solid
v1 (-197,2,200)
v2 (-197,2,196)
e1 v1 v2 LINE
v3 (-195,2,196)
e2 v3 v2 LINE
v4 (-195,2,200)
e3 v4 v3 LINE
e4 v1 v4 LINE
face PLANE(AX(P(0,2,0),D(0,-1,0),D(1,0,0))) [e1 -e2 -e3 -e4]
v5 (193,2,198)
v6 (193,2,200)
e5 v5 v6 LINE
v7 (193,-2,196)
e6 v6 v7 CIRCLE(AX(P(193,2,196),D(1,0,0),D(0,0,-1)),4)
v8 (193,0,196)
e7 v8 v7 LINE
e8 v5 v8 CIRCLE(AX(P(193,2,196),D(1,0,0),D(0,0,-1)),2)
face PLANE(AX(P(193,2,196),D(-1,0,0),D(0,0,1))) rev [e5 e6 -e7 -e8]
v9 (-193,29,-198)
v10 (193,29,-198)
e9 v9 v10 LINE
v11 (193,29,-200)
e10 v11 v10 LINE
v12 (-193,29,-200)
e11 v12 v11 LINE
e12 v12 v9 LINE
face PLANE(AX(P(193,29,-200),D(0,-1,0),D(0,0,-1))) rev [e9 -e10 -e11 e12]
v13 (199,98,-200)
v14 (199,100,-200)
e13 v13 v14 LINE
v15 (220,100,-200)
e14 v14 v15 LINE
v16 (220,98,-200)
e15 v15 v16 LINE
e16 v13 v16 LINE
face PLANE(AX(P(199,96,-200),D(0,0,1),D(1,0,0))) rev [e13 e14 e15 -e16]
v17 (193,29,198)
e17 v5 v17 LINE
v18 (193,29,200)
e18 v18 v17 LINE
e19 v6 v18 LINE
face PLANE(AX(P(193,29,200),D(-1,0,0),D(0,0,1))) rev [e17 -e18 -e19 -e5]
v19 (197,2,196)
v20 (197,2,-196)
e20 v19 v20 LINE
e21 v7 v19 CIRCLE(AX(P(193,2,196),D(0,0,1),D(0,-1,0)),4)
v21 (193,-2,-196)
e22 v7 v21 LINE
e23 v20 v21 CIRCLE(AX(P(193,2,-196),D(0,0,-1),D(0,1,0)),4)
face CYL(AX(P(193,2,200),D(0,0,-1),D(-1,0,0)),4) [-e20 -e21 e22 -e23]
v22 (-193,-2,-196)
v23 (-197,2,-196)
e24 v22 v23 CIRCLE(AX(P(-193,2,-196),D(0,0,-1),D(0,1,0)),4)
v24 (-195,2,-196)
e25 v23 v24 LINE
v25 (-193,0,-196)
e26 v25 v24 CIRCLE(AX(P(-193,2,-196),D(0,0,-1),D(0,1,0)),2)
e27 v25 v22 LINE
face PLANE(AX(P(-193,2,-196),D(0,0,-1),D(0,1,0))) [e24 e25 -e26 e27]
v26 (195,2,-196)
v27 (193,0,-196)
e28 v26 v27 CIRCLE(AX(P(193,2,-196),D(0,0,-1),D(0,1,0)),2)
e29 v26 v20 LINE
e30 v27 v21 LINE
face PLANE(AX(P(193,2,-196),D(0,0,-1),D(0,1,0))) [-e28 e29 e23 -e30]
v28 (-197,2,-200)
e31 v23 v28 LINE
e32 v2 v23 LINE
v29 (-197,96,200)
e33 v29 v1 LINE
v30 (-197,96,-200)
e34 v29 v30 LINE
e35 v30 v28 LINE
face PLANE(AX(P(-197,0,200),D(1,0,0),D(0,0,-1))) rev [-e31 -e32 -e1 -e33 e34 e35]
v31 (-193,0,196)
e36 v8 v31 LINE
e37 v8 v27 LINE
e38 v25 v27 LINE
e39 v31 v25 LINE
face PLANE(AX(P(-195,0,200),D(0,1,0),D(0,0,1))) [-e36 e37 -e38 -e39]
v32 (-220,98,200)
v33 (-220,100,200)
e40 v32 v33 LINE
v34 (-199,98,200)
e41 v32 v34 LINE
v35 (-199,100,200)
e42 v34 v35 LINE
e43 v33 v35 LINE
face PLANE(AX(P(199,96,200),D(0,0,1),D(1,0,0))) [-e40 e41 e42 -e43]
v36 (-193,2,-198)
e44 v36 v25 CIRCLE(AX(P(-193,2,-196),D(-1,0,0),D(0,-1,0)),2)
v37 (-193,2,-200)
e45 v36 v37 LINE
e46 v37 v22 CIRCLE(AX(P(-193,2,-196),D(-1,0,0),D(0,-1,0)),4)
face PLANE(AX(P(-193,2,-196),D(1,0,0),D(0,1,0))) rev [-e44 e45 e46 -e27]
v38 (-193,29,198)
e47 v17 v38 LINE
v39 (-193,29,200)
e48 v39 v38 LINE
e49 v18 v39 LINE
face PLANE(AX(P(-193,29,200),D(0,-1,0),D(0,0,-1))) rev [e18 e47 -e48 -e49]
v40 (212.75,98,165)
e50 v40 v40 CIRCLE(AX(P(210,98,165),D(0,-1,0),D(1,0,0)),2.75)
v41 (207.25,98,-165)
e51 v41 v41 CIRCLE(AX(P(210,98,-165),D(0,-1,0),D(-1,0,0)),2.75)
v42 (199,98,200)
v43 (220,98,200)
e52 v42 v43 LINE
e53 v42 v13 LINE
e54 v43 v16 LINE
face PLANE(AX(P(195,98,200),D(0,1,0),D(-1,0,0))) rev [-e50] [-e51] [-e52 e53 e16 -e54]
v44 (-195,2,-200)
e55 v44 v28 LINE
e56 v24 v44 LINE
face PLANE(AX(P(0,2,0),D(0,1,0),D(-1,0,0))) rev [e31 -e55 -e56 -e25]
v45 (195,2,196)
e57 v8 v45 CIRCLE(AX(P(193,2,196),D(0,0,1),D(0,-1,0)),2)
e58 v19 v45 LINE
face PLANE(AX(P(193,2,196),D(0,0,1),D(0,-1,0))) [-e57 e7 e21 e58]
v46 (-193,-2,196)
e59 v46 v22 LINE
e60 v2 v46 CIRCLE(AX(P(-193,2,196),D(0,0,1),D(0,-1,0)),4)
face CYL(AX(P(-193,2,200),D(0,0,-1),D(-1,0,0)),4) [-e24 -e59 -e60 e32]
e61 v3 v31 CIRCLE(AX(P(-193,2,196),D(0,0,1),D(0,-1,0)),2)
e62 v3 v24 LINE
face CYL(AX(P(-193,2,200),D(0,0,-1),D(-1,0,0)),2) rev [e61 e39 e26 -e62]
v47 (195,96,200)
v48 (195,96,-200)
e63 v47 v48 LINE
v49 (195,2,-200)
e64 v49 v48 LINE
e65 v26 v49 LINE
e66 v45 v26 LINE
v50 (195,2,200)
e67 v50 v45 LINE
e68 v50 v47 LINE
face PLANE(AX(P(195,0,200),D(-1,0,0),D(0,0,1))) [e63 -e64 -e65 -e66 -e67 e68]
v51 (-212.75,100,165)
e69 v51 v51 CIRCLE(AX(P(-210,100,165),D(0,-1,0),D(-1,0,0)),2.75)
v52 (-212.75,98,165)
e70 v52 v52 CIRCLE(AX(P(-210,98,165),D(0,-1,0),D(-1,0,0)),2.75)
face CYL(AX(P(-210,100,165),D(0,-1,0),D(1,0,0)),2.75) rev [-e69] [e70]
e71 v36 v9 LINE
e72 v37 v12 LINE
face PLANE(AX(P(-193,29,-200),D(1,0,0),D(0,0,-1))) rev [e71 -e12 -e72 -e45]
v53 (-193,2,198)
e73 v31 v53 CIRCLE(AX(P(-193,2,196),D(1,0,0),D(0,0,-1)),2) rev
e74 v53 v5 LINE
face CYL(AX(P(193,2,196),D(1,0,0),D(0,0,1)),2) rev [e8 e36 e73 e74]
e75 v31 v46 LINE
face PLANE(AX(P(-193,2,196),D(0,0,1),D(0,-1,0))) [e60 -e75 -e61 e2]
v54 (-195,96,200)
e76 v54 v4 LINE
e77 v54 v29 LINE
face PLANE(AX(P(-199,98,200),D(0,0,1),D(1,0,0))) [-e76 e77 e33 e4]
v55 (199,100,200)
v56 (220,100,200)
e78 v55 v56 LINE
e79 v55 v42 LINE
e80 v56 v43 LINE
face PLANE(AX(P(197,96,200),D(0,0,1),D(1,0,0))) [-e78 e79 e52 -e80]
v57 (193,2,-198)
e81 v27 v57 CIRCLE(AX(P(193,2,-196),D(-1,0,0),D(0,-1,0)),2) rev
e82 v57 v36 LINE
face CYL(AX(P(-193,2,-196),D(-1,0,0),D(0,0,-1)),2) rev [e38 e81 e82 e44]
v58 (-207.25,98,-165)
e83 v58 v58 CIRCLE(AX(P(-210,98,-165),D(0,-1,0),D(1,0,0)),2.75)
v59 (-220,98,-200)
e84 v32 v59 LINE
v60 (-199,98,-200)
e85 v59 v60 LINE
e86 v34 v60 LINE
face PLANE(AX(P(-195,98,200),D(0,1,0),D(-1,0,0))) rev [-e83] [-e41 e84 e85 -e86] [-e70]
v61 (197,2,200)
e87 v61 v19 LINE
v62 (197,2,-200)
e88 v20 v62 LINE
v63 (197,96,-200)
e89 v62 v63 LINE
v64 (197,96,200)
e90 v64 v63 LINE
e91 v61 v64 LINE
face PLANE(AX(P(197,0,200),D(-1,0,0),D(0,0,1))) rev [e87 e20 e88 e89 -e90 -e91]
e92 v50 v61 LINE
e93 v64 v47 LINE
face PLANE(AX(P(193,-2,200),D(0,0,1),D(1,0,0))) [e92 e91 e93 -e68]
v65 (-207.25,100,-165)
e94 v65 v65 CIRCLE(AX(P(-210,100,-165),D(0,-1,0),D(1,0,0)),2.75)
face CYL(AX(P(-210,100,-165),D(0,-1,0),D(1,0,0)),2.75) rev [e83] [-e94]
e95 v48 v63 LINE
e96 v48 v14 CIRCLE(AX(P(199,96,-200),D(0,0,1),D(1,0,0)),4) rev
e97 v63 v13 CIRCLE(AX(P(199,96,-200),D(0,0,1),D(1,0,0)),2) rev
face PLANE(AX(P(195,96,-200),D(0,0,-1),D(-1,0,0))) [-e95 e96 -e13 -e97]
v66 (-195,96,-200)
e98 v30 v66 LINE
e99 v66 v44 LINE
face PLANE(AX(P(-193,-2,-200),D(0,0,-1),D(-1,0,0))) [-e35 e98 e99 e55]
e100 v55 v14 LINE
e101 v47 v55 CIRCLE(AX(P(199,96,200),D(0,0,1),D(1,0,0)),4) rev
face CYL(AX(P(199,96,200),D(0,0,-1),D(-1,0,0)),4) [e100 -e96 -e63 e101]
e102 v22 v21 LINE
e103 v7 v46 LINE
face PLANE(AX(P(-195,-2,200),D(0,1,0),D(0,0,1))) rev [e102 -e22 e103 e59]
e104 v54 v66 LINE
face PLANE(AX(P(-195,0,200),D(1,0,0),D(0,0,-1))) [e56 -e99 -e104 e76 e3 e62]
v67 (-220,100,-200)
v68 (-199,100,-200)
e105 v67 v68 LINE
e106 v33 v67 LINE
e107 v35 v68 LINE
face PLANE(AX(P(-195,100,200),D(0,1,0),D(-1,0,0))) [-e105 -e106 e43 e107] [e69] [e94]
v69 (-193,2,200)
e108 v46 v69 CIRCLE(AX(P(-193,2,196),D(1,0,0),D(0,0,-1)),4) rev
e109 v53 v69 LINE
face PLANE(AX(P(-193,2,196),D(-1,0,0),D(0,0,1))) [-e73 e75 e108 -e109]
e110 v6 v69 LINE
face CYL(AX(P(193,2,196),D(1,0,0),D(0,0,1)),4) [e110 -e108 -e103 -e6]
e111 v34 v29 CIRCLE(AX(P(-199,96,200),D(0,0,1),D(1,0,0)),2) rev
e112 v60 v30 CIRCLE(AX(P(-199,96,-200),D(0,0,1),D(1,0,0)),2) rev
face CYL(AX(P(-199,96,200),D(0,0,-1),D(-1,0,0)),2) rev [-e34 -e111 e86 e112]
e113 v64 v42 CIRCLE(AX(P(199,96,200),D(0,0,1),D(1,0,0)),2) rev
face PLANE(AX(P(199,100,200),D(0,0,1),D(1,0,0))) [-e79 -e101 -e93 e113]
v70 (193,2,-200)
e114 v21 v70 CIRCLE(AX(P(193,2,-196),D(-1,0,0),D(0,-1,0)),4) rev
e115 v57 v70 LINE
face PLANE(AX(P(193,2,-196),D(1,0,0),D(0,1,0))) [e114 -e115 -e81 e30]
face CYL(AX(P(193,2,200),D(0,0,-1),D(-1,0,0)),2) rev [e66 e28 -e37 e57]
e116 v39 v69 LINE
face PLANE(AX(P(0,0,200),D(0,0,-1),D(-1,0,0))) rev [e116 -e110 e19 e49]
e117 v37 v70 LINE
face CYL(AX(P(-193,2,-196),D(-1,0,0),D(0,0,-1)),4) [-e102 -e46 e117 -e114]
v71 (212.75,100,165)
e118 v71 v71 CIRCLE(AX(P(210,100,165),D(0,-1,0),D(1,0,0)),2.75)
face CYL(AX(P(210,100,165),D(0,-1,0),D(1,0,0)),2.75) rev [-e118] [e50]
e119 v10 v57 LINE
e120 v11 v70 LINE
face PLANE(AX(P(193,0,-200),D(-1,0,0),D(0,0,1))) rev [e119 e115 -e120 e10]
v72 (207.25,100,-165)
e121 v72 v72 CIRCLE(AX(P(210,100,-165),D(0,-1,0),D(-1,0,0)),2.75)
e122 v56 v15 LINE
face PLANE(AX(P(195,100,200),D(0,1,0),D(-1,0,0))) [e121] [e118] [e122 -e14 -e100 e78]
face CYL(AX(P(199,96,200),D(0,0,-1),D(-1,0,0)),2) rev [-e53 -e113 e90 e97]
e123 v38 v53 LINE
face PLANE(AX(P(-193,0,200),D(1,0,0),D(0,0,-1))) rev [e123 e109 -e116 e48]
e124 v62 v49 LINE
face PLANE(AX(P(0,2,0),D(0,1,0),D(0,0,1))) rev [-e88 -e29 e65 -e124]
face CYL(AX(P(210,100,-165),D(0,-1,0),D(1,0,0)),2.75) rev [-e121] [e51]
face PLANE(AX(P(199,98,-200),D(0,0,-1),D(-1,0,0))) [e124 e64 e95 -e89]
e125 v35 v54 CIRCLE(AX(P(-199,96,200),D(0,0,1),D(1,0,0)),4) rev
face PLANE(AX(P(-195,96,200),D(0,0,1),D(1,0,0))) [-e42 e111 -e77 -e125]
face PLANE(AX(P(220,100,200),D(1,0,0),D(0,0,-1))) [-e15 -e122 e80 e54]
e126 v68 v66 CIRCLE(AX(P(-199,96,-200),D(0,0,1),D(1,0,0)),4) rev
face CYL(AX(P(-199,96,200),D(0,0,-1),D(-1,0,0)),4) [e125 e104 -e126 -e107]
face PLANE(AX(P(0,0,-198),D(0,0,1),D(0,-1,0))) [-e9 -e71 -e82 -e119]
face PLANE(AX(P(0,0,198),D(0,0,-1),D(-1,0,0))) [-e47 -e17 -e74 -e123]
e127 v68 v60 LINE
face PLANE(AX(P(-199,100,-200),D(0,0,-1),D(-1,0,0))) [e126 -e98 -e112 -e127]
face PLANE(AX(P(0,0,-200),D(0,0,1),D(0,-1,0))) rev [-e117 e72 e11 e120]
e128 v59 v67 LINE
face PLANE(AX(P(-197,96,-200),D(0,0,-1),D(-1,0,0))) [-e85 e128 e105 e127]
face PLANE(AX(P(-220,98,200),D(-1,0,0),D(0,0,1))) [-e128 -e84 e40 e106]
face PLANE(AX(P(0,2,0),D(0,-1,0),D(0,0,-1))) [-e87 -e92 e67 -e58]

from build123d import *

# Parameters (mm, degrees)
SM_BASE_FLANGE_1_DEPTH   = 200
SM_START                 = -197
SM_EDGE_FLANGE_1_DEPTH   = 394
SM_EDGE_FLANGE_1_2_DEPTH = 4
SM_START_2               = 193
SM_EDGE_FLANGE_1_3_DEPTH = 4
SM_START_3               = -193
SM_EDGE_FLANGE_1_4_DEPTH = 386
SKETCH_12_R              = 2.75
CUT_EXTRUDE_1_DEPTH      = 314.687742827


# Read off the part's stored shape, not the designer's step: Ребро-кромка1
# Sheet-metal steps are written as plain solids
with BuildPart() as part:
    # Sketch 1 → Базовая кромка1 (new, symmetric)
    with BuildSketch(Plane.XY):
        with BuildLine():
            Line((-220, 100), (-199, 100))
            ThreePointArc((-199, 100), (-196.171572875, 98.828427125), (-195, 96))
            Line((-195, 96), (-195, 2))
            ThreePointArc((-195, 2), (-194.414213562, 0.585786438), (-193, 0))
            Line((-193, 0), (193, 0))
            ThreePointArc((193, 0), (194.414213562, 0.585786438), (195, 2))
            Line((195, 2), (195, 96))
            ThreePointArc((195, 96), (196.171572875, 98.828427125), (199, 100))
            Line((199, 100), (220, 100))
            Line((220, 100), (220, 98))
            Line((220, 98), (199, 98))
            ThreePointArc((199, 98), (197.585786438, 97.414213562), (197, 96))
            Line((197, 96), (197, 2))
            ThreePointArc((197, 2), (195.828427125, -0.828427125), (193, -2))
            Line((193, -2), (-193, -2))
            ThreePointArc((-193, -2), (-195.828427125, -0.828427125), (-197, 2))
            Line((-197, 2), (-197, 96))
            ThreePointArc((-197, 96), (-197.585786438, 97.414213562), (-199, 98))
            Line((-199, 98), (-220, 98))
            Line((-220, 98), (-220, 100))
        make_face()
    extrude(amount=SM_BASE_FLANGE_1_DEPTH, both=True)

    # Ребро-кромка1 outline → Ребро-кромка1 (cut)
    with BuildSketch(Plane.YZ.offset(SM_START)):
        with BuildLine():
            ThreePointArc((2, -200), (-0.828427125, -198.828427125), (-2, -196))
            Line((-2, -196), (-2, -200))
            Line((-2, -200), (2, -200))
        make_face()
        with BuildLine():
            ThreePointArc((0, -196), (0.585786438, -197.414213562), (2, -198))
            Line((2, -198), (2, -196))
            Line((2, -196), (0, -196))
        make_face()
        with BuildLine():
            ThreePointArc((2, 198), (0.585786438, 197.414213562), (0, 196))
            Line((0, 196), (2, 196))
            Line((2, 196), (2, 198))
        make_face()
        with BuildLine():
            Line((-2, 200), (-2, 196))
            ThreePointArc((-2, 196), (-0.828427125, 198.828427125), (2, 200))
            Line((2, 200), (-2, 200))
        make_face()
    extrude(amount=SM_EDGE_FLANGE_1_DEPTH, mode=Mode.SUBTRACT)

    # Sm Edge Flange 1 2 outline → Sm Edge Flange 1 2 (cut)
    with BuildSketch(Plane.YZ.offset(SM_START)):
        with BuildLine():
            Line((2, -200), (2, -198))
            ThreePointArc((2, -198), (0.585786438, -197.414213562), (0, -196))
            Line((0, -196), (-2, -196))
            ThreePointArc((-2, -196), (-0.828427125, -198.828427125), (2, -200))
        make_face()
        with BuildLine():
            ThreePointArc((2, 200), (-0.828427125, 198.828427125), (-2, 196))
            Line((-2, 196), (0, 196))
            ThreePointArc((0, 196), (0.585786438, 197.414213562), (2, 198))
            Line((2, 198), (2, 200))
        make_face()
    extrude(amount=SM_EDGE_FLANGE_1_2_DEPTH, mode=Mode.SUBTRACT)

    # Sm Edge Flange 1 3 outline → Sm Edge Flange 1 3 (cut)
    with BuildSketch(Plane.YZ.offset(SM_START_2)):
        with BuildLine():
            Line((2, -200), (2, -198))
            ThreePointArc((2, -198), (0.585786438, -197.414213562), (0, -196))
            Line((0, -196), (-2, -196))
            ThreePointArc((-2, -196), (-0.828427125, -198.828427125), (2, -200))
        make_face()
        with BuildLine():
            ThreePointArc((2, 200), (-0.828427125, 198.828427125), (-2, 196))
            Line((-2, 196), (0, 196))
            ThreePointArc((0, 196), (0.585786438, 197.414213562), (2, 198))
            Line((2, 198), (2, 200))
        make_face()
    extrude(amount=SM_EDGE_FLANGE_1_3_DEPTH, mode=Mode.SUBTRACT)

    # Sm Edge Flange 1 4 outline → Sm Edge Flange 1 4 (add)
    with BuildSketch(Plane.YZ.offset(SM_START_3)):
        with BuildLine():
            ThreePointArc((0, -199.464101616), (0.96472382, -199.863703305), (2, -200))
            Line((2, -200), (29, -200))
            Line((29, -200), (29, -198))
            Line((29, -198), (2, -198))
            ThreePointArc((2, -198), (0.585786438, -197.414213562), (0, -196))
            Line((0, -196), (0, -199.464101616))
        make_face()
        with BuildLine():
            Line((0, 199.464101616), (0, 196))
            ThreePointArc((0, 196), (0.585786438, 197.414213562), (2, 198))
            Line((2, 198), (29, 198))
            Line((29, 198), (29, 200))
            Line((29, 200), (2, 200))
            ThreePointArc((2, 200), (0.96472382, 199.863703305), (0, 199.464101616))
        make_face()
    extrude(amount=SM_EDGE_FLANGE_1_4_DEPTH)

    # Эскиз12 → Вырез-Вытянуть1 (cut, through all)
    with BuildSketch(Plane.XZ.offset(-98)):
        with Locations((210, 165)):
            Circle(SKETCH_12_R)
        with Locations(Location((-210, 165, 0), (0, 0, 180))):
            Circle(SKETCH_12_R)
        with Locations(Location((210, -165, 0), (0, 0, 180))):
            Circle(SKETCH_12_R)
        with Locations((-210, -165)):
            Circle(SKETCH_12_R)
    extrude(amount=-CUT_EXTRUDE_1_DEPTH, mode=Mode.SUBTRACT)


solid = part.part
